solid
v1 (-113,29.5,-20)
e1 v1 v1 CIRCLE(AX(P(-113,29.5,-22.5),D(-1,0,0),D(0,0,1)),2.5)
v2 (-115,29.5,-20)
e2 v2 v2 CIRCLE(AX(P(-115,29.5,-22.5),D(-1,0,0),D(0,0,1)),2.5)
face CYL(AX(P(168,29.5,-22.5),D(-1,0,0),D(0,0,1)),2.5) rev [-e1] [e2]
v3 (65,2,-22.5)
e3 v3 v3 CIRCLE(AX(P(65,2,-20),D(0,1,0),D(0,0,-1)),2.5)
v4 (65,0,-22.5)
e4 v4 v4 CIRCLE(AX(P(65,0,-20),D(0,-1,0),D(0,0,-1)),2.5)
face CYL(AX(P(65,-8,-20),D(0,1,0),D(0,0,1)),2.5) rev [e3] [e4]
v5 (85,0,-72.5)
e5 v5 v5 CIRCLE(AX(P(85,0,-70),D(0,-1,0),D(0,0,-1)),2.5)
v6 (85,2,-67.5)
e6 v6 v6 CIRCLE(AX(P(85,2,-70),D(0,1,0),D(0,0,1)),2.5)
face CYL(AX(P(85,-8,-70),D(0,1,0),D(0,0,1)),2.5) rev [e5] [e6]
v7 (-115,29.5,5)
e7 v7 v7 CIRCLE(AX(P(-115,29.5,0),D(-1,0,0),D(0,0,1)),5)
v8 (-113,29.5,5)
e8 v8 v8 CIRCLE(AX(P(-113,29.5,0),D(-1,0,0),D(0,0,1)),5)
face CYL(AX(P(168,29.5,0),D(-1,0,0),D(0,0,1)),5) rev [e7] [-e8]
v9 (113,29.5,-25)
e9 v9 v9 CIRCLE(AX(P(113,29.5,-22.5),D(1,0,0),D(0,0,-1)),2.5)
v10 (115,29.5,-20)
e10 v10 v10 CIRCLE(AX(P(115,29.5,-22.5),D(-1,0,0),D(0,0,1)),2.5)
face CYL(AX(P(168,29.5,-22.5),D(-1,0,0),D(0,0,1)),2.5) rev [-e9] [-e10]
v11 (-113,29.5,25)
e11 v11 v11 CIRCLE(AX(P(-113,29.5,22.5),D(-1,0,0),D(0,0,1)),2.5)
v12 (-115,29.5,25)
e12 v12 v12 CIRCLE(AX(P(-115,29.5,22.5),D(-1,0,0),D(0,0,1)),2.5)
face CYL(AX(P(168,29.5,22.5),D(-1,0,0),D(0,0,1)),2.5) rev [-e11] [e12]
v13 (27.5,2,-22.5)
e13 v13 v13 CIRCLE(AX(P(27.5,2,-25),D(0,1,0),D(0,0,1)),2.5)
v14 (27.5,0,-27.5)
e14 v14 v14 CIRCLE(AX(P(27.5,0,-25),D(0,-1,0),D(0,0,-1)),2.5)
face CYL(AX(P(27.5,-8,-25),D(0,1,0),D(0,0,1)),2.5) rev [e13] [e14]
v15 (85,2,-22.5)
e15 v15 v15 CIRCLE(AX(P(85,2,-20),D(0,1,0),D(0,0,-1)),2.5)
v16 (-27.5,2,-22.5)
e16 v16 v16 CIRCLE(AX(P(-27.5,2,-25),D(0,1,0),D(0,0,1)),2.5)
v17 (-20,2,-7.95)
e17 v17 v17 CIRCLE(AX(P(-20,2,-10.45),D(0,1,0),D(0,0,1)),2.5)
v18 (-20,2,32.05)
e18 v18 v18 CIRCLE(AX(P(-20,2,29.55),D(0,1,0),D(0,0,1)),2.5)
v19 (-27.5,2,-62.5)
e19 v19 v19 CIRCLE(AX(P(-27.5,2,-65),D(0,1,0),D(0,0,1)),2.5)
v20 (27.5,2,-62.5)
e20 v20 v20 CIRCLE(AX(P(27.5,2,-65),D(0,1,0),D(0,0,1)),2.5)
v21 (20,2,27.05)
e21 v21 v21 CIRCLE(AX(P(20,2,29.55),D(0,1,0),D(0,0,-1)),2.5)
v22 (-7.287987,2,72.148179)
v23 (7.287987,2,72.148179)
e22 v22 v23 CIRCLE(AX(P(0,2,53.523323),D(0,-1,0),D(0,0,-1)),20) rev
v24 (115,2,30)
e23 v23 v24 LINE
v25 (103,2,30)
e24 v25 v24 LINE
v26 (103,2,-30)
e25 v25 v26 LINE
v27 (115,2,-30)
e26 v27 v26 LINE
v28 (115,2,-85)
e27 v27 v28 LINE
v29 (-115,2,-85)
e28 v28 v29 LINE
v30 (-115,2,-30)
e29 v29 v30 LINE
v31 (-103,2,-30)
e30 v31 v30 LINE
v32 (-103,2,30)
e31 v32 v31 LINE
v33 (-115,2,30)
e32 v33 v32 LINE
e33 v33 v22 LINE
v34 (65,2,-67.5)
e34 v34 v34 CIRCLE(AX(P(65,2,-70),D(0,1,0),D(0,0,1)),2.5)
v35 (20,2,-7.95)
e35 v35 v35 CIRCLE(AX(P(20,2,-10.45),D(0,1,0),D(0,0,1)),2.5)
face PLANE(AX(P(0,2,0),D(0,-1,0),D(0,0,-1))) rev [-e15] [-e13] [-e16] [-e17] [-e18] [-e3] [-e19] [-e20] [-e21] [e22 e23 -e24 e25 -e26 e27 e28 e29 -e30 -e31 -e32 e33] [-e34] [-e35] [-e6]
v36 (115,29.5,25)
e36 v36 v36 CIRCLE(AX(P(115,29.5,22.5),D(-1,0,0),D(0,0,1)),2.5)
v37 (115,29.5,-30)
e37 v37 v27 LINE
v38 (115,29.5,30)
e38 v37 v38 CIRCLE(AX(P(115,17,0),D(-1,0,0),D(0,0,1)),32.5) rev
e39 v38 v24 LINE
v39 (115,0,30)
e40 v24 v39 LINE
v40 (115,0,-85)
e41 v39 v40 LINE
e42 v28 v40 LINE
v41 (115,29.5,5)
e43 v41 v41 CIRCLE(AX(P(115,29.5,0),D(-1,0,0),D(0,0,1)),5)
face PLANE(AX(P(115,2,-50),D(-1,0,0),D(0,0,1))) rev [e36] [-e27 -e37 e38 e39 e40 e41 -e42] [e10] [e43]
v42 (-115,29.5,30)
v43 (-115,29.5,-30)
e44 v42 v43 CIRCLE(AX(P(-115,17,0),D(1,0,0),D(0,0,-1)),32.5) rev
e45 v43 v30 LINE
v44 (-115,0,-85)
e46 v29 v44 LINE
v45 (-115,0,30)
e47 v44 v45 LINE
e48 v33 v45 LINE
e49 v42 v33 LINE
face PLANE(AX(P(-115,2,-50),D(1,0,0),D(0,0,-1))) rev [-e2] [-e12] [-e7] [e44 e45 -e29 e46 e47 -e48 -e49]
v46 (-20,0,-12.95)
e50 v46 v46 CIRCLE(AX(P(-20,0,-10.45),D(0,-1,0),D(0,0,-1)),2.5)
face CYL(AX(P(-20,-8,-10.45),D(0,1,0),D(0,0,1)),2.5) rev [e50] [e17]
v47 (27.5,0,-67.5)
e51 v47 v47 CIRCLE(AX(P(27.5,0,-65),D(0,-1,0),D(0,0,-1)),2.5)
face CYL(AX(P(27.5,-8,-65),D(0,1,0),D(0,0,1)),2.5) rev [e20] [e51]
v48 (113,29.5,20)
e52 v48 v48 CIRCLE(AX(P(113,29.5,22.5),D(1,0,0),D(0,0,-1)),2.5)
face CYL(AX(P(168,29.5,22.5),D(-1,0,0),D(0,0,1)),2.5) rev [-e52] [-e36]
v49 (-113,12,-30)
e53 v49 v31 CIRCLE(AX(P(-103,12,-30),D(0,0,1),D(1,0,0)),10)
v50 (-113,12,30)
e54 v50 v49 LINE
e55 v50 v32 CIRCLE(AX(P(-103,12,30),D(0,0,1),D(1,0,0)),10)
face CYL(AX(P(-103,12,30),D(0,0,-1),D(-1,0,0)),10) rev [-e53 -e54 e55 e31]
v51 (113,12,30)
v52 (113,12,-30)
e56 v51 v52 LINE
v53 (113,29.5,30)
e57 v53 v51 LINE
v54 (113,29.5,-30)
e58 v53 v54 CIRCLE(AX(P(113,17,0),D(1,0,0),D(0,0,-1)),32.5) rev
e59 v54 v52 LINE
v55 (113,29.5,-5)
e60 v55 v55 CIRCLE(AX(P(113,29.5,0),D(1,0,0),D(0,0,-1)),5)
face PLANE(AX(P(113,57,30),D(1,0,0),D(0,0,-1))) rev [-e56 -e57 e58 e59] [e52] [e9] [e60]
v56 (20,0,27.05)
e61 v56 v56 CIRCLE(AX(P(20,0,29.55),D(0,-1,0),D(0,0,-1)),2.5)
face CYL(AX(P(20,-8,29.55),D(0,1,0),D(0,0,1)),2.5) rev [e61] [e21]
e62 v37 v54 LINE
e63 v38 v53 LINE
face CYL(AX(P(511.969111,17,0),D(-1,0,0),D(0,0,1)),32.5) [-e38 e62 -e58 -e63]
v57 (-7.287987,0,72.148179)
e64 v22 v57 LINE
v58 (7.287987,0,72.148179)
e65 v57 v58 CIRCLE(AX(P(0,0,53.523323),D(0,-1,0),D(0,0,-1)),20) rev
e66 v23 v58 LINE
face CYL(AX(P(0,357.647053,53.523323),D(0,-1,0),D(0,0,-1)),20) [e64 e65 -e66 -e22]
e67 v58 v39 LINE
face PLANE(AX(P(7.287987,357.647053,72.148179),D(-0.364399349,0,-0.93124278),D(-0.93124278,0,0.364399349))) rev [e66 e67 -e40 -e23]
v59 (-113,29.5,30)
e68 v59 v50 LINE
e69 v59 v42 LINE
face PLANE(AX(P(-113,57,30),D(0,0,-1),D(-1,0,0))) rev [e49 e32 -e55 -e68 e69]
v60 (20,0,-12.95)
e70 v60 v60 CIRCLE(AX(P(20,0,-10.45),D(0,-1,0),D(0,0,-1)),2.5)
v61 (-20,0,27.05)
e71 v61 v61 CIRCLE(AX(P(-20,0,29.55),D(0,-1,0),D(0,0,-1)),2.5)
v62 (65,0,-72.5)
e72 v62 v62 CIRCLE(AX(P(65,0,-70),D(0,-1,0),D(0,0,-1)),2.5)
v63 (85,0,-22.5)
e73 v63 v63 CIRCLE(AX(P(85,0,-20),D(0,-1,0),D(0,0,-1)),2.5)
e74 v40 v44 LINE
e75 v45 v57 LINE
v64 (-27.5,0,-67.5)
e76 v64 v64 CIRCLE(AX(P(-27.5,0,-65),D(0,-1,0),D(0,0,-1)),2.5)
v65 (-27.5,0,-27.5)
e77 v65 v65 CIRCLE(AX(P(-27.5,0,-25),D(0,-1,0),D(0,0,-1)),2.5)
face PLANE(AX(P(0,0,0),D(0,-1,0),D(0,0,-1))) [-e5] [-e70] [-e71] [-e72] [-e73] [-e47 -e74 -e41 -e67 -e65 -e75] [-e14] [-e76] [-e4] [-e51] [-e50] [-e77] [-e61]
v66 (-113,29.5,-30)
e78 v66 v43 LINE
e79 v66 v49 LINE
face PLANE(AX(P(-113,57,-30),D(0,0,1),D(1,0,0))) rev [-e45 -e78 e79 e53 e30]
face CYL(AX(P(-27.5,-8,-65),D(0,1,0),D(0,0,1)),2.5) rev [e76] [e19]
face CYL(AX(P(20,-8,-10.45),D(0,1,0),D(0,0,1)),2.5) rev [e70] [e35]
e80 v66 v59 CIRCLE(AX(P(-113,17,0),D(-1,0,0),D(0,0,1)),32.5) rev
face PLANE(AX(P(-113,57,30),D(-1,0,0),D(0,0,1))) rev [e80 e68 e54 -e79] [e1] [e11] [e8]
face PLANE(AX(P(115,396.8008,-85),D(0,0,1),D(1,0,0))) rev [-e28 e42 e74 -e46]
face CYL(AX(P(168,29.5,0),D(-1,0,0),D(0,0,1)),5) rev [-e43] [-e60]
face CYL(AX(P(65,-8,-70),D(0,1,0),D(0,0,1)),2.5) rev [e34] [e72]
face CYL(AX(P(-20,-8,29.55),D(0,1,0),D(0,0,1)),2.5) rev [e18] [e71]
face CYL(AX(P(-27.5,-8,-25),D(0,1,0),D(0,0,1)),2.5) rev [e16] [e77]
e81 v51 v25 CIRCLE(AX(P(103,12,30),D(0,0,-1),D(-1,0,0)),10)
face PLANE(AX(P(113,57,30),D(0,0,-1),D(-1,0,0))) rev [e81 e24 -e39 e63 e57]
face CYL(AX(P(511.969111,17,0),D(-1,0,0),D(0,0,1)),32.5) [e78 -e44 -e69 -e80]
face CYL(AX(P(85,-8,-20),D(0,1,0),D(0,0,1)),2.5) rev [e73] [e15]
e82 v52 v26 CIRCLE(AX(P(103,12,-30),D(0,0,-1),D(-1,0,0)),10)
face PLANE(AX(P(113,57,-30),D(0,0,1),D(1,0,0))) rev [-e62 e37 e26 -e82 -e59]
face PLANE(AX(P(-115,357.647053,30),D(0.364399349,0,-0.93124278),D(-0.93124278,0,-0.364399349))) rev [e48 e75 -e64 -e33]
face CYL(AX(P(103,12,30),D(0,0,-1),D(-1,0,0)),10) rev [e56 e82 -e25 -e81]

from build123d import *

# Parameters (mm, degrees)
BOSS_EXTRUDE1_DEPTH      = 2
SKETCH2_W                = 2
SKETCH2_H                = 60
BOSS_EXTRUDE2_DEPTH      = 55
SKETCH3_R                = 5
CUT_EXTRUDE1_DEPTH       = 283
SKETCH4_R                = 2.5
CUT_EXTRUDE2_DEPTH       = 283
SKETCH9_W                = 230
SKETCH9_H                = 50
BOSS_EXTRUDE3_DEPTH      = 2
SKETCH13_W               = 230
SKETCH13_H               = 10
BOSS_EXTRUDE6_DEPTH      = 20
CUT_EXTRUDE9_START       = -230
CUT_EXTRUDE9_DEPTH       = 230
SKETCH31_R               = 2.5
CUT_EXTRUDE11_DEPTH      = 10
SKETCH32_R               = 2.5
CUT_EXTRUDE12_DEPTH      = 10
SKETCH33_R               = 2.5
CUT_EXTRUDE13_DEPTH      = 10
CUT_EXTRUDE14_DEPTH      = 180.947909129
CUT_EXTRUDE14_DEPTH_BACK = 180.947909129
CUT_EXTRUDE16_DEPTH      = 151.685931659
CUT_EXTRUDE16_DEPTH_BACK = 151.685931659
BOSS_EXTRUDE8_DEPTH      = 60


# Read off the part's stored shape, not the designer's step: Cut-Extrude9
with BuildPart() as part:
    # Sketch1 → Boss-Extrude1 (new body)
    with BuildSketch(Plane(origin=(0, 0, 0), x_dir=(1, 0, 0), z_dir=(0, 1, 0))):
        Polygon((115, 50), (115, 80), (-115, 80), (-115, 50), (-115, -50), (-115, -75), (115, -75), (115, -50), align=None)
    extrude(amount=BOSS_EXTRUDE1_DEPTH)

    # Sketch2 → Boss-Extrude2 (add)
    with BuildSketch(Plane(origin=(0, 2, 0), x_dir=(1, 0, 0), z_dir=(0, 1, 0))):
        with Locations((-114, 0)):
            Rectangle(SKETCH2_W, SKETCH2_H)
        with Locations((114, 0)):
            Rectangle(SKETCH2_W, SKETCH2_H)
    extrude(amount=BOSS_EXTRUDE2_DEPTH)

    # Sketch3 → Cut-Extrude1 (cut)
    with BuildSketch(Plane.ZY.offset(115)):
        with Locations((0, 29.5)):
            Circle(SKETCH3_R)
    extrude(amount=-CUT_EXTRUDE1_DEPTH, mode=Mode.SUBTRACT)

    # Sketch4 → Cut-Extrude2 (cut)
    with BuildSketch(Plane.ZY.offset(115)):
        with Locations((-22.5, 29.5)):
            Circle(SKETCH4_R)
        with Locations((22.5, 29.5)):
            Circle(SKETCH4_R)
    extrude(amount=-CUT_EXTRUDE2_DEPTH, mode=Mode.SUBTRACT)

    # Sketch9 → Boss-Extrude3 (add)
    with BuildSketch(Plane(origin=(0, 2, 0), x_dir=(1, 0, 0), z_dir=(0, 1, 0))):
        with Locations((0, 105)):
            Rectangle(SKETCH9_W, SKETCH9_H)
    extrude(amount=-BOSS_EXTRUDE3_DEPTH)

    # Sketch13 → Boss-Extrude6 (add)
    with BuildSketch(Plane.XZ):
        with Locations((0, -125)):
            Rectangle(SKETCH13_W, SKETCH13_H)
    extrude(amount=BOSS_EXTRUDE6_DEPTH)

    # Cut-Extrude9 outline → Cut-Extrude9 (cut)
    with BuildSketch(Plane(origin=(115, 0, 0), x_dir=(0, 0, -1), z_dir=(1, 0, 0)).offset(CUT_EXTRUDE9_START)):
        with BuildLine():
            Line((-30, 57), (-30, 29.5))
            ThreePointArc((-30, 29.5), (0, 49.5), (30, 29.5))
            Line((30, 29.5), (30, 57))
            Line((30, 57), (-30, 57))
        make_face()
    extrude(amount=CUT_EXTRUDE9_DEPTH, mode=Mode.SUBTRACT)

    # Sketch31 → Cut-Extrude11 (cut)
    with BuildSketch(Plane(origin=(0, 2, 0), x_dir=(1, 0, 0), z_dir=(0, 1, 0))):
        with Locations(Location((-27.5, 65, 0), (0, 0, 270))):
            Circle(SKETCH31_R)
        with Locations(Location((27.5, 65, 0), (0, 0, 270))):
            Circle(SKETCH31_R)
        with Locations(Location((-27.5, 25, 0), (0, 0, 270))):
            Circle(SKETCH31_R)
        with Locations(Location((27.5, 25, 0), (0, 0, 270))):
            Circle(SKETCH31_R)
    extrude(amount=-CUT_EXTRUDE11_DEPTH, mode=Mode.SUBTRACT)

    # Sketch32 → Cut-Extrude12 (cut)
    with BuildSketch(Plane(origin=(0, 2, 0), x_dir=(1, 0, 0), z_dir=(0, 1, 0))):
        with Locations(Location((85, 70, 0), (0, 0, 270))):
            Circle(SKETCH32_R)
        with Locations(Location((65, 70, 0), (0, 0, 270))):
            Circle(SKETCH32_R)
        with Locations(Location((65, 20, 0), (0, 0, 90))):
            Circle(SKETCH32_R)
        with Locations(Location((85, 20, 0), (0, 0, 90))):
            Circle(SKETCH32_R)
    extrude(amount=-CUT_EXTRUDE12_DEPTH, mode=Mode.SUBTRACT)

    # Sketch33 → Cut-Extrude13 (cut)
    with BuildSketch(Plane(origin=(0, 2, 0), x_dir=(1, 0, 0), z_dir=(0, 1, 0))):
        with Locations(Location((-20, 10.45, 0), (0, 0, 270))):
            Circle(SKETCH33_R)
        with Locations(Location((20, 10.45, 0), (0, 0, 270))):
            Circle(SKETCH33_R)
        with Locations(Location((-20, -29.55, 0), (0, 0, 270))):
            Circle(SKETCH33_R)
        with Locations(Location((20, -29.55, 0), (0, 0, 90))):
            Circle(SKETCH33_R)
    extrude(amount=-CUT_EXTRUDE13_DEPTH, mode=Mode.SUBTRACT)

    # Sketch34 → Cut-Extrude14 (cut, two sides: drawn at the far end of the back side and taken through both)
    with BuildSketch(Plane(origin=(0, 2, 0), x_dir=(1, 0, 0), z_dir=(0, 1, 0)).offset(-CUT_EXTRUDE14_DEPTH_BACK)):
        Polygon((685.357029045, 85), (115, 85), (-115, 85), (-685.357029045, 85), (-685.357029045, 1225.71405809), (685.357029045, 1225.71405809), align=None)
    extrude(amount=CUT_EXTRUDE14_DEPTH + CUT_EXTRUDE14_DEPTH_BACK, mode=Mode.SUBTRACT)

    # Sketch36 → Cut-Extrude16 (cut, two sides: drawn at the far end of the back side and taken through both)
    with BuildSketch(Plane(origin=(0, 2, 0), x_dir=(1, 0, 0), z_dir=(0, 1, 0)).offset(-CUT_EXTRUDE16_DEPTH_BACK)):
        with BuildLine():
            Line((-603.246524362, 161.052987794), (-115, -30))
            Line((-115, -30), (-7.287986972, -72.148179011))
            ThreePointArc((-7.287986972, -72.148179011), (0, -73.523323417), (7.287986972, -72.148179011))
            Line((7.287986972, -72.148179011), (115, -30))
            Line((115, -30), (603.246524362, 161.052987794))
            Line((603.246524362, 161.052987794), (603.246524362, -887.538281856))
            Line((603.246524362, -887.538281856), (-603.246524362, -887.538281856))
            Line((-603.246524362, -887.538281856), (-603.246524362, 161.052987794))
        make_face()
    extrude(amount=CUT_EXTRUDE16_DEPTH + CUT_EXTRUDE16_DEPTH_BACK, mode=Mode.SUBTRACT)

    # Sketch37 → Boss-Extrude8 (add)
    with BuildSketch(Plane(origin=(0, 0, -30), x_dir=(-1, 0, 0), z_dir=(0, 0, -1))):
        with BuildLine():
            Line((-103, 2), (-113, 2))
            Line((-113, 2), (-113, 12))
            ThreePointArc((-113, 12), (-110.071067812, 4.928932188), (-103, 2))
        make_face()
        with BuildLine():
            Line((103, 2), (113, 2))
            Line((113, 2), (113, 12))
            ThreePointArc((113, 12), (110.071067812, 4.928932188), (103, 2))
        make_face()
    extrude(amount=-BOSS_EXTRUDE8_DEPTH)


solid = part.part
